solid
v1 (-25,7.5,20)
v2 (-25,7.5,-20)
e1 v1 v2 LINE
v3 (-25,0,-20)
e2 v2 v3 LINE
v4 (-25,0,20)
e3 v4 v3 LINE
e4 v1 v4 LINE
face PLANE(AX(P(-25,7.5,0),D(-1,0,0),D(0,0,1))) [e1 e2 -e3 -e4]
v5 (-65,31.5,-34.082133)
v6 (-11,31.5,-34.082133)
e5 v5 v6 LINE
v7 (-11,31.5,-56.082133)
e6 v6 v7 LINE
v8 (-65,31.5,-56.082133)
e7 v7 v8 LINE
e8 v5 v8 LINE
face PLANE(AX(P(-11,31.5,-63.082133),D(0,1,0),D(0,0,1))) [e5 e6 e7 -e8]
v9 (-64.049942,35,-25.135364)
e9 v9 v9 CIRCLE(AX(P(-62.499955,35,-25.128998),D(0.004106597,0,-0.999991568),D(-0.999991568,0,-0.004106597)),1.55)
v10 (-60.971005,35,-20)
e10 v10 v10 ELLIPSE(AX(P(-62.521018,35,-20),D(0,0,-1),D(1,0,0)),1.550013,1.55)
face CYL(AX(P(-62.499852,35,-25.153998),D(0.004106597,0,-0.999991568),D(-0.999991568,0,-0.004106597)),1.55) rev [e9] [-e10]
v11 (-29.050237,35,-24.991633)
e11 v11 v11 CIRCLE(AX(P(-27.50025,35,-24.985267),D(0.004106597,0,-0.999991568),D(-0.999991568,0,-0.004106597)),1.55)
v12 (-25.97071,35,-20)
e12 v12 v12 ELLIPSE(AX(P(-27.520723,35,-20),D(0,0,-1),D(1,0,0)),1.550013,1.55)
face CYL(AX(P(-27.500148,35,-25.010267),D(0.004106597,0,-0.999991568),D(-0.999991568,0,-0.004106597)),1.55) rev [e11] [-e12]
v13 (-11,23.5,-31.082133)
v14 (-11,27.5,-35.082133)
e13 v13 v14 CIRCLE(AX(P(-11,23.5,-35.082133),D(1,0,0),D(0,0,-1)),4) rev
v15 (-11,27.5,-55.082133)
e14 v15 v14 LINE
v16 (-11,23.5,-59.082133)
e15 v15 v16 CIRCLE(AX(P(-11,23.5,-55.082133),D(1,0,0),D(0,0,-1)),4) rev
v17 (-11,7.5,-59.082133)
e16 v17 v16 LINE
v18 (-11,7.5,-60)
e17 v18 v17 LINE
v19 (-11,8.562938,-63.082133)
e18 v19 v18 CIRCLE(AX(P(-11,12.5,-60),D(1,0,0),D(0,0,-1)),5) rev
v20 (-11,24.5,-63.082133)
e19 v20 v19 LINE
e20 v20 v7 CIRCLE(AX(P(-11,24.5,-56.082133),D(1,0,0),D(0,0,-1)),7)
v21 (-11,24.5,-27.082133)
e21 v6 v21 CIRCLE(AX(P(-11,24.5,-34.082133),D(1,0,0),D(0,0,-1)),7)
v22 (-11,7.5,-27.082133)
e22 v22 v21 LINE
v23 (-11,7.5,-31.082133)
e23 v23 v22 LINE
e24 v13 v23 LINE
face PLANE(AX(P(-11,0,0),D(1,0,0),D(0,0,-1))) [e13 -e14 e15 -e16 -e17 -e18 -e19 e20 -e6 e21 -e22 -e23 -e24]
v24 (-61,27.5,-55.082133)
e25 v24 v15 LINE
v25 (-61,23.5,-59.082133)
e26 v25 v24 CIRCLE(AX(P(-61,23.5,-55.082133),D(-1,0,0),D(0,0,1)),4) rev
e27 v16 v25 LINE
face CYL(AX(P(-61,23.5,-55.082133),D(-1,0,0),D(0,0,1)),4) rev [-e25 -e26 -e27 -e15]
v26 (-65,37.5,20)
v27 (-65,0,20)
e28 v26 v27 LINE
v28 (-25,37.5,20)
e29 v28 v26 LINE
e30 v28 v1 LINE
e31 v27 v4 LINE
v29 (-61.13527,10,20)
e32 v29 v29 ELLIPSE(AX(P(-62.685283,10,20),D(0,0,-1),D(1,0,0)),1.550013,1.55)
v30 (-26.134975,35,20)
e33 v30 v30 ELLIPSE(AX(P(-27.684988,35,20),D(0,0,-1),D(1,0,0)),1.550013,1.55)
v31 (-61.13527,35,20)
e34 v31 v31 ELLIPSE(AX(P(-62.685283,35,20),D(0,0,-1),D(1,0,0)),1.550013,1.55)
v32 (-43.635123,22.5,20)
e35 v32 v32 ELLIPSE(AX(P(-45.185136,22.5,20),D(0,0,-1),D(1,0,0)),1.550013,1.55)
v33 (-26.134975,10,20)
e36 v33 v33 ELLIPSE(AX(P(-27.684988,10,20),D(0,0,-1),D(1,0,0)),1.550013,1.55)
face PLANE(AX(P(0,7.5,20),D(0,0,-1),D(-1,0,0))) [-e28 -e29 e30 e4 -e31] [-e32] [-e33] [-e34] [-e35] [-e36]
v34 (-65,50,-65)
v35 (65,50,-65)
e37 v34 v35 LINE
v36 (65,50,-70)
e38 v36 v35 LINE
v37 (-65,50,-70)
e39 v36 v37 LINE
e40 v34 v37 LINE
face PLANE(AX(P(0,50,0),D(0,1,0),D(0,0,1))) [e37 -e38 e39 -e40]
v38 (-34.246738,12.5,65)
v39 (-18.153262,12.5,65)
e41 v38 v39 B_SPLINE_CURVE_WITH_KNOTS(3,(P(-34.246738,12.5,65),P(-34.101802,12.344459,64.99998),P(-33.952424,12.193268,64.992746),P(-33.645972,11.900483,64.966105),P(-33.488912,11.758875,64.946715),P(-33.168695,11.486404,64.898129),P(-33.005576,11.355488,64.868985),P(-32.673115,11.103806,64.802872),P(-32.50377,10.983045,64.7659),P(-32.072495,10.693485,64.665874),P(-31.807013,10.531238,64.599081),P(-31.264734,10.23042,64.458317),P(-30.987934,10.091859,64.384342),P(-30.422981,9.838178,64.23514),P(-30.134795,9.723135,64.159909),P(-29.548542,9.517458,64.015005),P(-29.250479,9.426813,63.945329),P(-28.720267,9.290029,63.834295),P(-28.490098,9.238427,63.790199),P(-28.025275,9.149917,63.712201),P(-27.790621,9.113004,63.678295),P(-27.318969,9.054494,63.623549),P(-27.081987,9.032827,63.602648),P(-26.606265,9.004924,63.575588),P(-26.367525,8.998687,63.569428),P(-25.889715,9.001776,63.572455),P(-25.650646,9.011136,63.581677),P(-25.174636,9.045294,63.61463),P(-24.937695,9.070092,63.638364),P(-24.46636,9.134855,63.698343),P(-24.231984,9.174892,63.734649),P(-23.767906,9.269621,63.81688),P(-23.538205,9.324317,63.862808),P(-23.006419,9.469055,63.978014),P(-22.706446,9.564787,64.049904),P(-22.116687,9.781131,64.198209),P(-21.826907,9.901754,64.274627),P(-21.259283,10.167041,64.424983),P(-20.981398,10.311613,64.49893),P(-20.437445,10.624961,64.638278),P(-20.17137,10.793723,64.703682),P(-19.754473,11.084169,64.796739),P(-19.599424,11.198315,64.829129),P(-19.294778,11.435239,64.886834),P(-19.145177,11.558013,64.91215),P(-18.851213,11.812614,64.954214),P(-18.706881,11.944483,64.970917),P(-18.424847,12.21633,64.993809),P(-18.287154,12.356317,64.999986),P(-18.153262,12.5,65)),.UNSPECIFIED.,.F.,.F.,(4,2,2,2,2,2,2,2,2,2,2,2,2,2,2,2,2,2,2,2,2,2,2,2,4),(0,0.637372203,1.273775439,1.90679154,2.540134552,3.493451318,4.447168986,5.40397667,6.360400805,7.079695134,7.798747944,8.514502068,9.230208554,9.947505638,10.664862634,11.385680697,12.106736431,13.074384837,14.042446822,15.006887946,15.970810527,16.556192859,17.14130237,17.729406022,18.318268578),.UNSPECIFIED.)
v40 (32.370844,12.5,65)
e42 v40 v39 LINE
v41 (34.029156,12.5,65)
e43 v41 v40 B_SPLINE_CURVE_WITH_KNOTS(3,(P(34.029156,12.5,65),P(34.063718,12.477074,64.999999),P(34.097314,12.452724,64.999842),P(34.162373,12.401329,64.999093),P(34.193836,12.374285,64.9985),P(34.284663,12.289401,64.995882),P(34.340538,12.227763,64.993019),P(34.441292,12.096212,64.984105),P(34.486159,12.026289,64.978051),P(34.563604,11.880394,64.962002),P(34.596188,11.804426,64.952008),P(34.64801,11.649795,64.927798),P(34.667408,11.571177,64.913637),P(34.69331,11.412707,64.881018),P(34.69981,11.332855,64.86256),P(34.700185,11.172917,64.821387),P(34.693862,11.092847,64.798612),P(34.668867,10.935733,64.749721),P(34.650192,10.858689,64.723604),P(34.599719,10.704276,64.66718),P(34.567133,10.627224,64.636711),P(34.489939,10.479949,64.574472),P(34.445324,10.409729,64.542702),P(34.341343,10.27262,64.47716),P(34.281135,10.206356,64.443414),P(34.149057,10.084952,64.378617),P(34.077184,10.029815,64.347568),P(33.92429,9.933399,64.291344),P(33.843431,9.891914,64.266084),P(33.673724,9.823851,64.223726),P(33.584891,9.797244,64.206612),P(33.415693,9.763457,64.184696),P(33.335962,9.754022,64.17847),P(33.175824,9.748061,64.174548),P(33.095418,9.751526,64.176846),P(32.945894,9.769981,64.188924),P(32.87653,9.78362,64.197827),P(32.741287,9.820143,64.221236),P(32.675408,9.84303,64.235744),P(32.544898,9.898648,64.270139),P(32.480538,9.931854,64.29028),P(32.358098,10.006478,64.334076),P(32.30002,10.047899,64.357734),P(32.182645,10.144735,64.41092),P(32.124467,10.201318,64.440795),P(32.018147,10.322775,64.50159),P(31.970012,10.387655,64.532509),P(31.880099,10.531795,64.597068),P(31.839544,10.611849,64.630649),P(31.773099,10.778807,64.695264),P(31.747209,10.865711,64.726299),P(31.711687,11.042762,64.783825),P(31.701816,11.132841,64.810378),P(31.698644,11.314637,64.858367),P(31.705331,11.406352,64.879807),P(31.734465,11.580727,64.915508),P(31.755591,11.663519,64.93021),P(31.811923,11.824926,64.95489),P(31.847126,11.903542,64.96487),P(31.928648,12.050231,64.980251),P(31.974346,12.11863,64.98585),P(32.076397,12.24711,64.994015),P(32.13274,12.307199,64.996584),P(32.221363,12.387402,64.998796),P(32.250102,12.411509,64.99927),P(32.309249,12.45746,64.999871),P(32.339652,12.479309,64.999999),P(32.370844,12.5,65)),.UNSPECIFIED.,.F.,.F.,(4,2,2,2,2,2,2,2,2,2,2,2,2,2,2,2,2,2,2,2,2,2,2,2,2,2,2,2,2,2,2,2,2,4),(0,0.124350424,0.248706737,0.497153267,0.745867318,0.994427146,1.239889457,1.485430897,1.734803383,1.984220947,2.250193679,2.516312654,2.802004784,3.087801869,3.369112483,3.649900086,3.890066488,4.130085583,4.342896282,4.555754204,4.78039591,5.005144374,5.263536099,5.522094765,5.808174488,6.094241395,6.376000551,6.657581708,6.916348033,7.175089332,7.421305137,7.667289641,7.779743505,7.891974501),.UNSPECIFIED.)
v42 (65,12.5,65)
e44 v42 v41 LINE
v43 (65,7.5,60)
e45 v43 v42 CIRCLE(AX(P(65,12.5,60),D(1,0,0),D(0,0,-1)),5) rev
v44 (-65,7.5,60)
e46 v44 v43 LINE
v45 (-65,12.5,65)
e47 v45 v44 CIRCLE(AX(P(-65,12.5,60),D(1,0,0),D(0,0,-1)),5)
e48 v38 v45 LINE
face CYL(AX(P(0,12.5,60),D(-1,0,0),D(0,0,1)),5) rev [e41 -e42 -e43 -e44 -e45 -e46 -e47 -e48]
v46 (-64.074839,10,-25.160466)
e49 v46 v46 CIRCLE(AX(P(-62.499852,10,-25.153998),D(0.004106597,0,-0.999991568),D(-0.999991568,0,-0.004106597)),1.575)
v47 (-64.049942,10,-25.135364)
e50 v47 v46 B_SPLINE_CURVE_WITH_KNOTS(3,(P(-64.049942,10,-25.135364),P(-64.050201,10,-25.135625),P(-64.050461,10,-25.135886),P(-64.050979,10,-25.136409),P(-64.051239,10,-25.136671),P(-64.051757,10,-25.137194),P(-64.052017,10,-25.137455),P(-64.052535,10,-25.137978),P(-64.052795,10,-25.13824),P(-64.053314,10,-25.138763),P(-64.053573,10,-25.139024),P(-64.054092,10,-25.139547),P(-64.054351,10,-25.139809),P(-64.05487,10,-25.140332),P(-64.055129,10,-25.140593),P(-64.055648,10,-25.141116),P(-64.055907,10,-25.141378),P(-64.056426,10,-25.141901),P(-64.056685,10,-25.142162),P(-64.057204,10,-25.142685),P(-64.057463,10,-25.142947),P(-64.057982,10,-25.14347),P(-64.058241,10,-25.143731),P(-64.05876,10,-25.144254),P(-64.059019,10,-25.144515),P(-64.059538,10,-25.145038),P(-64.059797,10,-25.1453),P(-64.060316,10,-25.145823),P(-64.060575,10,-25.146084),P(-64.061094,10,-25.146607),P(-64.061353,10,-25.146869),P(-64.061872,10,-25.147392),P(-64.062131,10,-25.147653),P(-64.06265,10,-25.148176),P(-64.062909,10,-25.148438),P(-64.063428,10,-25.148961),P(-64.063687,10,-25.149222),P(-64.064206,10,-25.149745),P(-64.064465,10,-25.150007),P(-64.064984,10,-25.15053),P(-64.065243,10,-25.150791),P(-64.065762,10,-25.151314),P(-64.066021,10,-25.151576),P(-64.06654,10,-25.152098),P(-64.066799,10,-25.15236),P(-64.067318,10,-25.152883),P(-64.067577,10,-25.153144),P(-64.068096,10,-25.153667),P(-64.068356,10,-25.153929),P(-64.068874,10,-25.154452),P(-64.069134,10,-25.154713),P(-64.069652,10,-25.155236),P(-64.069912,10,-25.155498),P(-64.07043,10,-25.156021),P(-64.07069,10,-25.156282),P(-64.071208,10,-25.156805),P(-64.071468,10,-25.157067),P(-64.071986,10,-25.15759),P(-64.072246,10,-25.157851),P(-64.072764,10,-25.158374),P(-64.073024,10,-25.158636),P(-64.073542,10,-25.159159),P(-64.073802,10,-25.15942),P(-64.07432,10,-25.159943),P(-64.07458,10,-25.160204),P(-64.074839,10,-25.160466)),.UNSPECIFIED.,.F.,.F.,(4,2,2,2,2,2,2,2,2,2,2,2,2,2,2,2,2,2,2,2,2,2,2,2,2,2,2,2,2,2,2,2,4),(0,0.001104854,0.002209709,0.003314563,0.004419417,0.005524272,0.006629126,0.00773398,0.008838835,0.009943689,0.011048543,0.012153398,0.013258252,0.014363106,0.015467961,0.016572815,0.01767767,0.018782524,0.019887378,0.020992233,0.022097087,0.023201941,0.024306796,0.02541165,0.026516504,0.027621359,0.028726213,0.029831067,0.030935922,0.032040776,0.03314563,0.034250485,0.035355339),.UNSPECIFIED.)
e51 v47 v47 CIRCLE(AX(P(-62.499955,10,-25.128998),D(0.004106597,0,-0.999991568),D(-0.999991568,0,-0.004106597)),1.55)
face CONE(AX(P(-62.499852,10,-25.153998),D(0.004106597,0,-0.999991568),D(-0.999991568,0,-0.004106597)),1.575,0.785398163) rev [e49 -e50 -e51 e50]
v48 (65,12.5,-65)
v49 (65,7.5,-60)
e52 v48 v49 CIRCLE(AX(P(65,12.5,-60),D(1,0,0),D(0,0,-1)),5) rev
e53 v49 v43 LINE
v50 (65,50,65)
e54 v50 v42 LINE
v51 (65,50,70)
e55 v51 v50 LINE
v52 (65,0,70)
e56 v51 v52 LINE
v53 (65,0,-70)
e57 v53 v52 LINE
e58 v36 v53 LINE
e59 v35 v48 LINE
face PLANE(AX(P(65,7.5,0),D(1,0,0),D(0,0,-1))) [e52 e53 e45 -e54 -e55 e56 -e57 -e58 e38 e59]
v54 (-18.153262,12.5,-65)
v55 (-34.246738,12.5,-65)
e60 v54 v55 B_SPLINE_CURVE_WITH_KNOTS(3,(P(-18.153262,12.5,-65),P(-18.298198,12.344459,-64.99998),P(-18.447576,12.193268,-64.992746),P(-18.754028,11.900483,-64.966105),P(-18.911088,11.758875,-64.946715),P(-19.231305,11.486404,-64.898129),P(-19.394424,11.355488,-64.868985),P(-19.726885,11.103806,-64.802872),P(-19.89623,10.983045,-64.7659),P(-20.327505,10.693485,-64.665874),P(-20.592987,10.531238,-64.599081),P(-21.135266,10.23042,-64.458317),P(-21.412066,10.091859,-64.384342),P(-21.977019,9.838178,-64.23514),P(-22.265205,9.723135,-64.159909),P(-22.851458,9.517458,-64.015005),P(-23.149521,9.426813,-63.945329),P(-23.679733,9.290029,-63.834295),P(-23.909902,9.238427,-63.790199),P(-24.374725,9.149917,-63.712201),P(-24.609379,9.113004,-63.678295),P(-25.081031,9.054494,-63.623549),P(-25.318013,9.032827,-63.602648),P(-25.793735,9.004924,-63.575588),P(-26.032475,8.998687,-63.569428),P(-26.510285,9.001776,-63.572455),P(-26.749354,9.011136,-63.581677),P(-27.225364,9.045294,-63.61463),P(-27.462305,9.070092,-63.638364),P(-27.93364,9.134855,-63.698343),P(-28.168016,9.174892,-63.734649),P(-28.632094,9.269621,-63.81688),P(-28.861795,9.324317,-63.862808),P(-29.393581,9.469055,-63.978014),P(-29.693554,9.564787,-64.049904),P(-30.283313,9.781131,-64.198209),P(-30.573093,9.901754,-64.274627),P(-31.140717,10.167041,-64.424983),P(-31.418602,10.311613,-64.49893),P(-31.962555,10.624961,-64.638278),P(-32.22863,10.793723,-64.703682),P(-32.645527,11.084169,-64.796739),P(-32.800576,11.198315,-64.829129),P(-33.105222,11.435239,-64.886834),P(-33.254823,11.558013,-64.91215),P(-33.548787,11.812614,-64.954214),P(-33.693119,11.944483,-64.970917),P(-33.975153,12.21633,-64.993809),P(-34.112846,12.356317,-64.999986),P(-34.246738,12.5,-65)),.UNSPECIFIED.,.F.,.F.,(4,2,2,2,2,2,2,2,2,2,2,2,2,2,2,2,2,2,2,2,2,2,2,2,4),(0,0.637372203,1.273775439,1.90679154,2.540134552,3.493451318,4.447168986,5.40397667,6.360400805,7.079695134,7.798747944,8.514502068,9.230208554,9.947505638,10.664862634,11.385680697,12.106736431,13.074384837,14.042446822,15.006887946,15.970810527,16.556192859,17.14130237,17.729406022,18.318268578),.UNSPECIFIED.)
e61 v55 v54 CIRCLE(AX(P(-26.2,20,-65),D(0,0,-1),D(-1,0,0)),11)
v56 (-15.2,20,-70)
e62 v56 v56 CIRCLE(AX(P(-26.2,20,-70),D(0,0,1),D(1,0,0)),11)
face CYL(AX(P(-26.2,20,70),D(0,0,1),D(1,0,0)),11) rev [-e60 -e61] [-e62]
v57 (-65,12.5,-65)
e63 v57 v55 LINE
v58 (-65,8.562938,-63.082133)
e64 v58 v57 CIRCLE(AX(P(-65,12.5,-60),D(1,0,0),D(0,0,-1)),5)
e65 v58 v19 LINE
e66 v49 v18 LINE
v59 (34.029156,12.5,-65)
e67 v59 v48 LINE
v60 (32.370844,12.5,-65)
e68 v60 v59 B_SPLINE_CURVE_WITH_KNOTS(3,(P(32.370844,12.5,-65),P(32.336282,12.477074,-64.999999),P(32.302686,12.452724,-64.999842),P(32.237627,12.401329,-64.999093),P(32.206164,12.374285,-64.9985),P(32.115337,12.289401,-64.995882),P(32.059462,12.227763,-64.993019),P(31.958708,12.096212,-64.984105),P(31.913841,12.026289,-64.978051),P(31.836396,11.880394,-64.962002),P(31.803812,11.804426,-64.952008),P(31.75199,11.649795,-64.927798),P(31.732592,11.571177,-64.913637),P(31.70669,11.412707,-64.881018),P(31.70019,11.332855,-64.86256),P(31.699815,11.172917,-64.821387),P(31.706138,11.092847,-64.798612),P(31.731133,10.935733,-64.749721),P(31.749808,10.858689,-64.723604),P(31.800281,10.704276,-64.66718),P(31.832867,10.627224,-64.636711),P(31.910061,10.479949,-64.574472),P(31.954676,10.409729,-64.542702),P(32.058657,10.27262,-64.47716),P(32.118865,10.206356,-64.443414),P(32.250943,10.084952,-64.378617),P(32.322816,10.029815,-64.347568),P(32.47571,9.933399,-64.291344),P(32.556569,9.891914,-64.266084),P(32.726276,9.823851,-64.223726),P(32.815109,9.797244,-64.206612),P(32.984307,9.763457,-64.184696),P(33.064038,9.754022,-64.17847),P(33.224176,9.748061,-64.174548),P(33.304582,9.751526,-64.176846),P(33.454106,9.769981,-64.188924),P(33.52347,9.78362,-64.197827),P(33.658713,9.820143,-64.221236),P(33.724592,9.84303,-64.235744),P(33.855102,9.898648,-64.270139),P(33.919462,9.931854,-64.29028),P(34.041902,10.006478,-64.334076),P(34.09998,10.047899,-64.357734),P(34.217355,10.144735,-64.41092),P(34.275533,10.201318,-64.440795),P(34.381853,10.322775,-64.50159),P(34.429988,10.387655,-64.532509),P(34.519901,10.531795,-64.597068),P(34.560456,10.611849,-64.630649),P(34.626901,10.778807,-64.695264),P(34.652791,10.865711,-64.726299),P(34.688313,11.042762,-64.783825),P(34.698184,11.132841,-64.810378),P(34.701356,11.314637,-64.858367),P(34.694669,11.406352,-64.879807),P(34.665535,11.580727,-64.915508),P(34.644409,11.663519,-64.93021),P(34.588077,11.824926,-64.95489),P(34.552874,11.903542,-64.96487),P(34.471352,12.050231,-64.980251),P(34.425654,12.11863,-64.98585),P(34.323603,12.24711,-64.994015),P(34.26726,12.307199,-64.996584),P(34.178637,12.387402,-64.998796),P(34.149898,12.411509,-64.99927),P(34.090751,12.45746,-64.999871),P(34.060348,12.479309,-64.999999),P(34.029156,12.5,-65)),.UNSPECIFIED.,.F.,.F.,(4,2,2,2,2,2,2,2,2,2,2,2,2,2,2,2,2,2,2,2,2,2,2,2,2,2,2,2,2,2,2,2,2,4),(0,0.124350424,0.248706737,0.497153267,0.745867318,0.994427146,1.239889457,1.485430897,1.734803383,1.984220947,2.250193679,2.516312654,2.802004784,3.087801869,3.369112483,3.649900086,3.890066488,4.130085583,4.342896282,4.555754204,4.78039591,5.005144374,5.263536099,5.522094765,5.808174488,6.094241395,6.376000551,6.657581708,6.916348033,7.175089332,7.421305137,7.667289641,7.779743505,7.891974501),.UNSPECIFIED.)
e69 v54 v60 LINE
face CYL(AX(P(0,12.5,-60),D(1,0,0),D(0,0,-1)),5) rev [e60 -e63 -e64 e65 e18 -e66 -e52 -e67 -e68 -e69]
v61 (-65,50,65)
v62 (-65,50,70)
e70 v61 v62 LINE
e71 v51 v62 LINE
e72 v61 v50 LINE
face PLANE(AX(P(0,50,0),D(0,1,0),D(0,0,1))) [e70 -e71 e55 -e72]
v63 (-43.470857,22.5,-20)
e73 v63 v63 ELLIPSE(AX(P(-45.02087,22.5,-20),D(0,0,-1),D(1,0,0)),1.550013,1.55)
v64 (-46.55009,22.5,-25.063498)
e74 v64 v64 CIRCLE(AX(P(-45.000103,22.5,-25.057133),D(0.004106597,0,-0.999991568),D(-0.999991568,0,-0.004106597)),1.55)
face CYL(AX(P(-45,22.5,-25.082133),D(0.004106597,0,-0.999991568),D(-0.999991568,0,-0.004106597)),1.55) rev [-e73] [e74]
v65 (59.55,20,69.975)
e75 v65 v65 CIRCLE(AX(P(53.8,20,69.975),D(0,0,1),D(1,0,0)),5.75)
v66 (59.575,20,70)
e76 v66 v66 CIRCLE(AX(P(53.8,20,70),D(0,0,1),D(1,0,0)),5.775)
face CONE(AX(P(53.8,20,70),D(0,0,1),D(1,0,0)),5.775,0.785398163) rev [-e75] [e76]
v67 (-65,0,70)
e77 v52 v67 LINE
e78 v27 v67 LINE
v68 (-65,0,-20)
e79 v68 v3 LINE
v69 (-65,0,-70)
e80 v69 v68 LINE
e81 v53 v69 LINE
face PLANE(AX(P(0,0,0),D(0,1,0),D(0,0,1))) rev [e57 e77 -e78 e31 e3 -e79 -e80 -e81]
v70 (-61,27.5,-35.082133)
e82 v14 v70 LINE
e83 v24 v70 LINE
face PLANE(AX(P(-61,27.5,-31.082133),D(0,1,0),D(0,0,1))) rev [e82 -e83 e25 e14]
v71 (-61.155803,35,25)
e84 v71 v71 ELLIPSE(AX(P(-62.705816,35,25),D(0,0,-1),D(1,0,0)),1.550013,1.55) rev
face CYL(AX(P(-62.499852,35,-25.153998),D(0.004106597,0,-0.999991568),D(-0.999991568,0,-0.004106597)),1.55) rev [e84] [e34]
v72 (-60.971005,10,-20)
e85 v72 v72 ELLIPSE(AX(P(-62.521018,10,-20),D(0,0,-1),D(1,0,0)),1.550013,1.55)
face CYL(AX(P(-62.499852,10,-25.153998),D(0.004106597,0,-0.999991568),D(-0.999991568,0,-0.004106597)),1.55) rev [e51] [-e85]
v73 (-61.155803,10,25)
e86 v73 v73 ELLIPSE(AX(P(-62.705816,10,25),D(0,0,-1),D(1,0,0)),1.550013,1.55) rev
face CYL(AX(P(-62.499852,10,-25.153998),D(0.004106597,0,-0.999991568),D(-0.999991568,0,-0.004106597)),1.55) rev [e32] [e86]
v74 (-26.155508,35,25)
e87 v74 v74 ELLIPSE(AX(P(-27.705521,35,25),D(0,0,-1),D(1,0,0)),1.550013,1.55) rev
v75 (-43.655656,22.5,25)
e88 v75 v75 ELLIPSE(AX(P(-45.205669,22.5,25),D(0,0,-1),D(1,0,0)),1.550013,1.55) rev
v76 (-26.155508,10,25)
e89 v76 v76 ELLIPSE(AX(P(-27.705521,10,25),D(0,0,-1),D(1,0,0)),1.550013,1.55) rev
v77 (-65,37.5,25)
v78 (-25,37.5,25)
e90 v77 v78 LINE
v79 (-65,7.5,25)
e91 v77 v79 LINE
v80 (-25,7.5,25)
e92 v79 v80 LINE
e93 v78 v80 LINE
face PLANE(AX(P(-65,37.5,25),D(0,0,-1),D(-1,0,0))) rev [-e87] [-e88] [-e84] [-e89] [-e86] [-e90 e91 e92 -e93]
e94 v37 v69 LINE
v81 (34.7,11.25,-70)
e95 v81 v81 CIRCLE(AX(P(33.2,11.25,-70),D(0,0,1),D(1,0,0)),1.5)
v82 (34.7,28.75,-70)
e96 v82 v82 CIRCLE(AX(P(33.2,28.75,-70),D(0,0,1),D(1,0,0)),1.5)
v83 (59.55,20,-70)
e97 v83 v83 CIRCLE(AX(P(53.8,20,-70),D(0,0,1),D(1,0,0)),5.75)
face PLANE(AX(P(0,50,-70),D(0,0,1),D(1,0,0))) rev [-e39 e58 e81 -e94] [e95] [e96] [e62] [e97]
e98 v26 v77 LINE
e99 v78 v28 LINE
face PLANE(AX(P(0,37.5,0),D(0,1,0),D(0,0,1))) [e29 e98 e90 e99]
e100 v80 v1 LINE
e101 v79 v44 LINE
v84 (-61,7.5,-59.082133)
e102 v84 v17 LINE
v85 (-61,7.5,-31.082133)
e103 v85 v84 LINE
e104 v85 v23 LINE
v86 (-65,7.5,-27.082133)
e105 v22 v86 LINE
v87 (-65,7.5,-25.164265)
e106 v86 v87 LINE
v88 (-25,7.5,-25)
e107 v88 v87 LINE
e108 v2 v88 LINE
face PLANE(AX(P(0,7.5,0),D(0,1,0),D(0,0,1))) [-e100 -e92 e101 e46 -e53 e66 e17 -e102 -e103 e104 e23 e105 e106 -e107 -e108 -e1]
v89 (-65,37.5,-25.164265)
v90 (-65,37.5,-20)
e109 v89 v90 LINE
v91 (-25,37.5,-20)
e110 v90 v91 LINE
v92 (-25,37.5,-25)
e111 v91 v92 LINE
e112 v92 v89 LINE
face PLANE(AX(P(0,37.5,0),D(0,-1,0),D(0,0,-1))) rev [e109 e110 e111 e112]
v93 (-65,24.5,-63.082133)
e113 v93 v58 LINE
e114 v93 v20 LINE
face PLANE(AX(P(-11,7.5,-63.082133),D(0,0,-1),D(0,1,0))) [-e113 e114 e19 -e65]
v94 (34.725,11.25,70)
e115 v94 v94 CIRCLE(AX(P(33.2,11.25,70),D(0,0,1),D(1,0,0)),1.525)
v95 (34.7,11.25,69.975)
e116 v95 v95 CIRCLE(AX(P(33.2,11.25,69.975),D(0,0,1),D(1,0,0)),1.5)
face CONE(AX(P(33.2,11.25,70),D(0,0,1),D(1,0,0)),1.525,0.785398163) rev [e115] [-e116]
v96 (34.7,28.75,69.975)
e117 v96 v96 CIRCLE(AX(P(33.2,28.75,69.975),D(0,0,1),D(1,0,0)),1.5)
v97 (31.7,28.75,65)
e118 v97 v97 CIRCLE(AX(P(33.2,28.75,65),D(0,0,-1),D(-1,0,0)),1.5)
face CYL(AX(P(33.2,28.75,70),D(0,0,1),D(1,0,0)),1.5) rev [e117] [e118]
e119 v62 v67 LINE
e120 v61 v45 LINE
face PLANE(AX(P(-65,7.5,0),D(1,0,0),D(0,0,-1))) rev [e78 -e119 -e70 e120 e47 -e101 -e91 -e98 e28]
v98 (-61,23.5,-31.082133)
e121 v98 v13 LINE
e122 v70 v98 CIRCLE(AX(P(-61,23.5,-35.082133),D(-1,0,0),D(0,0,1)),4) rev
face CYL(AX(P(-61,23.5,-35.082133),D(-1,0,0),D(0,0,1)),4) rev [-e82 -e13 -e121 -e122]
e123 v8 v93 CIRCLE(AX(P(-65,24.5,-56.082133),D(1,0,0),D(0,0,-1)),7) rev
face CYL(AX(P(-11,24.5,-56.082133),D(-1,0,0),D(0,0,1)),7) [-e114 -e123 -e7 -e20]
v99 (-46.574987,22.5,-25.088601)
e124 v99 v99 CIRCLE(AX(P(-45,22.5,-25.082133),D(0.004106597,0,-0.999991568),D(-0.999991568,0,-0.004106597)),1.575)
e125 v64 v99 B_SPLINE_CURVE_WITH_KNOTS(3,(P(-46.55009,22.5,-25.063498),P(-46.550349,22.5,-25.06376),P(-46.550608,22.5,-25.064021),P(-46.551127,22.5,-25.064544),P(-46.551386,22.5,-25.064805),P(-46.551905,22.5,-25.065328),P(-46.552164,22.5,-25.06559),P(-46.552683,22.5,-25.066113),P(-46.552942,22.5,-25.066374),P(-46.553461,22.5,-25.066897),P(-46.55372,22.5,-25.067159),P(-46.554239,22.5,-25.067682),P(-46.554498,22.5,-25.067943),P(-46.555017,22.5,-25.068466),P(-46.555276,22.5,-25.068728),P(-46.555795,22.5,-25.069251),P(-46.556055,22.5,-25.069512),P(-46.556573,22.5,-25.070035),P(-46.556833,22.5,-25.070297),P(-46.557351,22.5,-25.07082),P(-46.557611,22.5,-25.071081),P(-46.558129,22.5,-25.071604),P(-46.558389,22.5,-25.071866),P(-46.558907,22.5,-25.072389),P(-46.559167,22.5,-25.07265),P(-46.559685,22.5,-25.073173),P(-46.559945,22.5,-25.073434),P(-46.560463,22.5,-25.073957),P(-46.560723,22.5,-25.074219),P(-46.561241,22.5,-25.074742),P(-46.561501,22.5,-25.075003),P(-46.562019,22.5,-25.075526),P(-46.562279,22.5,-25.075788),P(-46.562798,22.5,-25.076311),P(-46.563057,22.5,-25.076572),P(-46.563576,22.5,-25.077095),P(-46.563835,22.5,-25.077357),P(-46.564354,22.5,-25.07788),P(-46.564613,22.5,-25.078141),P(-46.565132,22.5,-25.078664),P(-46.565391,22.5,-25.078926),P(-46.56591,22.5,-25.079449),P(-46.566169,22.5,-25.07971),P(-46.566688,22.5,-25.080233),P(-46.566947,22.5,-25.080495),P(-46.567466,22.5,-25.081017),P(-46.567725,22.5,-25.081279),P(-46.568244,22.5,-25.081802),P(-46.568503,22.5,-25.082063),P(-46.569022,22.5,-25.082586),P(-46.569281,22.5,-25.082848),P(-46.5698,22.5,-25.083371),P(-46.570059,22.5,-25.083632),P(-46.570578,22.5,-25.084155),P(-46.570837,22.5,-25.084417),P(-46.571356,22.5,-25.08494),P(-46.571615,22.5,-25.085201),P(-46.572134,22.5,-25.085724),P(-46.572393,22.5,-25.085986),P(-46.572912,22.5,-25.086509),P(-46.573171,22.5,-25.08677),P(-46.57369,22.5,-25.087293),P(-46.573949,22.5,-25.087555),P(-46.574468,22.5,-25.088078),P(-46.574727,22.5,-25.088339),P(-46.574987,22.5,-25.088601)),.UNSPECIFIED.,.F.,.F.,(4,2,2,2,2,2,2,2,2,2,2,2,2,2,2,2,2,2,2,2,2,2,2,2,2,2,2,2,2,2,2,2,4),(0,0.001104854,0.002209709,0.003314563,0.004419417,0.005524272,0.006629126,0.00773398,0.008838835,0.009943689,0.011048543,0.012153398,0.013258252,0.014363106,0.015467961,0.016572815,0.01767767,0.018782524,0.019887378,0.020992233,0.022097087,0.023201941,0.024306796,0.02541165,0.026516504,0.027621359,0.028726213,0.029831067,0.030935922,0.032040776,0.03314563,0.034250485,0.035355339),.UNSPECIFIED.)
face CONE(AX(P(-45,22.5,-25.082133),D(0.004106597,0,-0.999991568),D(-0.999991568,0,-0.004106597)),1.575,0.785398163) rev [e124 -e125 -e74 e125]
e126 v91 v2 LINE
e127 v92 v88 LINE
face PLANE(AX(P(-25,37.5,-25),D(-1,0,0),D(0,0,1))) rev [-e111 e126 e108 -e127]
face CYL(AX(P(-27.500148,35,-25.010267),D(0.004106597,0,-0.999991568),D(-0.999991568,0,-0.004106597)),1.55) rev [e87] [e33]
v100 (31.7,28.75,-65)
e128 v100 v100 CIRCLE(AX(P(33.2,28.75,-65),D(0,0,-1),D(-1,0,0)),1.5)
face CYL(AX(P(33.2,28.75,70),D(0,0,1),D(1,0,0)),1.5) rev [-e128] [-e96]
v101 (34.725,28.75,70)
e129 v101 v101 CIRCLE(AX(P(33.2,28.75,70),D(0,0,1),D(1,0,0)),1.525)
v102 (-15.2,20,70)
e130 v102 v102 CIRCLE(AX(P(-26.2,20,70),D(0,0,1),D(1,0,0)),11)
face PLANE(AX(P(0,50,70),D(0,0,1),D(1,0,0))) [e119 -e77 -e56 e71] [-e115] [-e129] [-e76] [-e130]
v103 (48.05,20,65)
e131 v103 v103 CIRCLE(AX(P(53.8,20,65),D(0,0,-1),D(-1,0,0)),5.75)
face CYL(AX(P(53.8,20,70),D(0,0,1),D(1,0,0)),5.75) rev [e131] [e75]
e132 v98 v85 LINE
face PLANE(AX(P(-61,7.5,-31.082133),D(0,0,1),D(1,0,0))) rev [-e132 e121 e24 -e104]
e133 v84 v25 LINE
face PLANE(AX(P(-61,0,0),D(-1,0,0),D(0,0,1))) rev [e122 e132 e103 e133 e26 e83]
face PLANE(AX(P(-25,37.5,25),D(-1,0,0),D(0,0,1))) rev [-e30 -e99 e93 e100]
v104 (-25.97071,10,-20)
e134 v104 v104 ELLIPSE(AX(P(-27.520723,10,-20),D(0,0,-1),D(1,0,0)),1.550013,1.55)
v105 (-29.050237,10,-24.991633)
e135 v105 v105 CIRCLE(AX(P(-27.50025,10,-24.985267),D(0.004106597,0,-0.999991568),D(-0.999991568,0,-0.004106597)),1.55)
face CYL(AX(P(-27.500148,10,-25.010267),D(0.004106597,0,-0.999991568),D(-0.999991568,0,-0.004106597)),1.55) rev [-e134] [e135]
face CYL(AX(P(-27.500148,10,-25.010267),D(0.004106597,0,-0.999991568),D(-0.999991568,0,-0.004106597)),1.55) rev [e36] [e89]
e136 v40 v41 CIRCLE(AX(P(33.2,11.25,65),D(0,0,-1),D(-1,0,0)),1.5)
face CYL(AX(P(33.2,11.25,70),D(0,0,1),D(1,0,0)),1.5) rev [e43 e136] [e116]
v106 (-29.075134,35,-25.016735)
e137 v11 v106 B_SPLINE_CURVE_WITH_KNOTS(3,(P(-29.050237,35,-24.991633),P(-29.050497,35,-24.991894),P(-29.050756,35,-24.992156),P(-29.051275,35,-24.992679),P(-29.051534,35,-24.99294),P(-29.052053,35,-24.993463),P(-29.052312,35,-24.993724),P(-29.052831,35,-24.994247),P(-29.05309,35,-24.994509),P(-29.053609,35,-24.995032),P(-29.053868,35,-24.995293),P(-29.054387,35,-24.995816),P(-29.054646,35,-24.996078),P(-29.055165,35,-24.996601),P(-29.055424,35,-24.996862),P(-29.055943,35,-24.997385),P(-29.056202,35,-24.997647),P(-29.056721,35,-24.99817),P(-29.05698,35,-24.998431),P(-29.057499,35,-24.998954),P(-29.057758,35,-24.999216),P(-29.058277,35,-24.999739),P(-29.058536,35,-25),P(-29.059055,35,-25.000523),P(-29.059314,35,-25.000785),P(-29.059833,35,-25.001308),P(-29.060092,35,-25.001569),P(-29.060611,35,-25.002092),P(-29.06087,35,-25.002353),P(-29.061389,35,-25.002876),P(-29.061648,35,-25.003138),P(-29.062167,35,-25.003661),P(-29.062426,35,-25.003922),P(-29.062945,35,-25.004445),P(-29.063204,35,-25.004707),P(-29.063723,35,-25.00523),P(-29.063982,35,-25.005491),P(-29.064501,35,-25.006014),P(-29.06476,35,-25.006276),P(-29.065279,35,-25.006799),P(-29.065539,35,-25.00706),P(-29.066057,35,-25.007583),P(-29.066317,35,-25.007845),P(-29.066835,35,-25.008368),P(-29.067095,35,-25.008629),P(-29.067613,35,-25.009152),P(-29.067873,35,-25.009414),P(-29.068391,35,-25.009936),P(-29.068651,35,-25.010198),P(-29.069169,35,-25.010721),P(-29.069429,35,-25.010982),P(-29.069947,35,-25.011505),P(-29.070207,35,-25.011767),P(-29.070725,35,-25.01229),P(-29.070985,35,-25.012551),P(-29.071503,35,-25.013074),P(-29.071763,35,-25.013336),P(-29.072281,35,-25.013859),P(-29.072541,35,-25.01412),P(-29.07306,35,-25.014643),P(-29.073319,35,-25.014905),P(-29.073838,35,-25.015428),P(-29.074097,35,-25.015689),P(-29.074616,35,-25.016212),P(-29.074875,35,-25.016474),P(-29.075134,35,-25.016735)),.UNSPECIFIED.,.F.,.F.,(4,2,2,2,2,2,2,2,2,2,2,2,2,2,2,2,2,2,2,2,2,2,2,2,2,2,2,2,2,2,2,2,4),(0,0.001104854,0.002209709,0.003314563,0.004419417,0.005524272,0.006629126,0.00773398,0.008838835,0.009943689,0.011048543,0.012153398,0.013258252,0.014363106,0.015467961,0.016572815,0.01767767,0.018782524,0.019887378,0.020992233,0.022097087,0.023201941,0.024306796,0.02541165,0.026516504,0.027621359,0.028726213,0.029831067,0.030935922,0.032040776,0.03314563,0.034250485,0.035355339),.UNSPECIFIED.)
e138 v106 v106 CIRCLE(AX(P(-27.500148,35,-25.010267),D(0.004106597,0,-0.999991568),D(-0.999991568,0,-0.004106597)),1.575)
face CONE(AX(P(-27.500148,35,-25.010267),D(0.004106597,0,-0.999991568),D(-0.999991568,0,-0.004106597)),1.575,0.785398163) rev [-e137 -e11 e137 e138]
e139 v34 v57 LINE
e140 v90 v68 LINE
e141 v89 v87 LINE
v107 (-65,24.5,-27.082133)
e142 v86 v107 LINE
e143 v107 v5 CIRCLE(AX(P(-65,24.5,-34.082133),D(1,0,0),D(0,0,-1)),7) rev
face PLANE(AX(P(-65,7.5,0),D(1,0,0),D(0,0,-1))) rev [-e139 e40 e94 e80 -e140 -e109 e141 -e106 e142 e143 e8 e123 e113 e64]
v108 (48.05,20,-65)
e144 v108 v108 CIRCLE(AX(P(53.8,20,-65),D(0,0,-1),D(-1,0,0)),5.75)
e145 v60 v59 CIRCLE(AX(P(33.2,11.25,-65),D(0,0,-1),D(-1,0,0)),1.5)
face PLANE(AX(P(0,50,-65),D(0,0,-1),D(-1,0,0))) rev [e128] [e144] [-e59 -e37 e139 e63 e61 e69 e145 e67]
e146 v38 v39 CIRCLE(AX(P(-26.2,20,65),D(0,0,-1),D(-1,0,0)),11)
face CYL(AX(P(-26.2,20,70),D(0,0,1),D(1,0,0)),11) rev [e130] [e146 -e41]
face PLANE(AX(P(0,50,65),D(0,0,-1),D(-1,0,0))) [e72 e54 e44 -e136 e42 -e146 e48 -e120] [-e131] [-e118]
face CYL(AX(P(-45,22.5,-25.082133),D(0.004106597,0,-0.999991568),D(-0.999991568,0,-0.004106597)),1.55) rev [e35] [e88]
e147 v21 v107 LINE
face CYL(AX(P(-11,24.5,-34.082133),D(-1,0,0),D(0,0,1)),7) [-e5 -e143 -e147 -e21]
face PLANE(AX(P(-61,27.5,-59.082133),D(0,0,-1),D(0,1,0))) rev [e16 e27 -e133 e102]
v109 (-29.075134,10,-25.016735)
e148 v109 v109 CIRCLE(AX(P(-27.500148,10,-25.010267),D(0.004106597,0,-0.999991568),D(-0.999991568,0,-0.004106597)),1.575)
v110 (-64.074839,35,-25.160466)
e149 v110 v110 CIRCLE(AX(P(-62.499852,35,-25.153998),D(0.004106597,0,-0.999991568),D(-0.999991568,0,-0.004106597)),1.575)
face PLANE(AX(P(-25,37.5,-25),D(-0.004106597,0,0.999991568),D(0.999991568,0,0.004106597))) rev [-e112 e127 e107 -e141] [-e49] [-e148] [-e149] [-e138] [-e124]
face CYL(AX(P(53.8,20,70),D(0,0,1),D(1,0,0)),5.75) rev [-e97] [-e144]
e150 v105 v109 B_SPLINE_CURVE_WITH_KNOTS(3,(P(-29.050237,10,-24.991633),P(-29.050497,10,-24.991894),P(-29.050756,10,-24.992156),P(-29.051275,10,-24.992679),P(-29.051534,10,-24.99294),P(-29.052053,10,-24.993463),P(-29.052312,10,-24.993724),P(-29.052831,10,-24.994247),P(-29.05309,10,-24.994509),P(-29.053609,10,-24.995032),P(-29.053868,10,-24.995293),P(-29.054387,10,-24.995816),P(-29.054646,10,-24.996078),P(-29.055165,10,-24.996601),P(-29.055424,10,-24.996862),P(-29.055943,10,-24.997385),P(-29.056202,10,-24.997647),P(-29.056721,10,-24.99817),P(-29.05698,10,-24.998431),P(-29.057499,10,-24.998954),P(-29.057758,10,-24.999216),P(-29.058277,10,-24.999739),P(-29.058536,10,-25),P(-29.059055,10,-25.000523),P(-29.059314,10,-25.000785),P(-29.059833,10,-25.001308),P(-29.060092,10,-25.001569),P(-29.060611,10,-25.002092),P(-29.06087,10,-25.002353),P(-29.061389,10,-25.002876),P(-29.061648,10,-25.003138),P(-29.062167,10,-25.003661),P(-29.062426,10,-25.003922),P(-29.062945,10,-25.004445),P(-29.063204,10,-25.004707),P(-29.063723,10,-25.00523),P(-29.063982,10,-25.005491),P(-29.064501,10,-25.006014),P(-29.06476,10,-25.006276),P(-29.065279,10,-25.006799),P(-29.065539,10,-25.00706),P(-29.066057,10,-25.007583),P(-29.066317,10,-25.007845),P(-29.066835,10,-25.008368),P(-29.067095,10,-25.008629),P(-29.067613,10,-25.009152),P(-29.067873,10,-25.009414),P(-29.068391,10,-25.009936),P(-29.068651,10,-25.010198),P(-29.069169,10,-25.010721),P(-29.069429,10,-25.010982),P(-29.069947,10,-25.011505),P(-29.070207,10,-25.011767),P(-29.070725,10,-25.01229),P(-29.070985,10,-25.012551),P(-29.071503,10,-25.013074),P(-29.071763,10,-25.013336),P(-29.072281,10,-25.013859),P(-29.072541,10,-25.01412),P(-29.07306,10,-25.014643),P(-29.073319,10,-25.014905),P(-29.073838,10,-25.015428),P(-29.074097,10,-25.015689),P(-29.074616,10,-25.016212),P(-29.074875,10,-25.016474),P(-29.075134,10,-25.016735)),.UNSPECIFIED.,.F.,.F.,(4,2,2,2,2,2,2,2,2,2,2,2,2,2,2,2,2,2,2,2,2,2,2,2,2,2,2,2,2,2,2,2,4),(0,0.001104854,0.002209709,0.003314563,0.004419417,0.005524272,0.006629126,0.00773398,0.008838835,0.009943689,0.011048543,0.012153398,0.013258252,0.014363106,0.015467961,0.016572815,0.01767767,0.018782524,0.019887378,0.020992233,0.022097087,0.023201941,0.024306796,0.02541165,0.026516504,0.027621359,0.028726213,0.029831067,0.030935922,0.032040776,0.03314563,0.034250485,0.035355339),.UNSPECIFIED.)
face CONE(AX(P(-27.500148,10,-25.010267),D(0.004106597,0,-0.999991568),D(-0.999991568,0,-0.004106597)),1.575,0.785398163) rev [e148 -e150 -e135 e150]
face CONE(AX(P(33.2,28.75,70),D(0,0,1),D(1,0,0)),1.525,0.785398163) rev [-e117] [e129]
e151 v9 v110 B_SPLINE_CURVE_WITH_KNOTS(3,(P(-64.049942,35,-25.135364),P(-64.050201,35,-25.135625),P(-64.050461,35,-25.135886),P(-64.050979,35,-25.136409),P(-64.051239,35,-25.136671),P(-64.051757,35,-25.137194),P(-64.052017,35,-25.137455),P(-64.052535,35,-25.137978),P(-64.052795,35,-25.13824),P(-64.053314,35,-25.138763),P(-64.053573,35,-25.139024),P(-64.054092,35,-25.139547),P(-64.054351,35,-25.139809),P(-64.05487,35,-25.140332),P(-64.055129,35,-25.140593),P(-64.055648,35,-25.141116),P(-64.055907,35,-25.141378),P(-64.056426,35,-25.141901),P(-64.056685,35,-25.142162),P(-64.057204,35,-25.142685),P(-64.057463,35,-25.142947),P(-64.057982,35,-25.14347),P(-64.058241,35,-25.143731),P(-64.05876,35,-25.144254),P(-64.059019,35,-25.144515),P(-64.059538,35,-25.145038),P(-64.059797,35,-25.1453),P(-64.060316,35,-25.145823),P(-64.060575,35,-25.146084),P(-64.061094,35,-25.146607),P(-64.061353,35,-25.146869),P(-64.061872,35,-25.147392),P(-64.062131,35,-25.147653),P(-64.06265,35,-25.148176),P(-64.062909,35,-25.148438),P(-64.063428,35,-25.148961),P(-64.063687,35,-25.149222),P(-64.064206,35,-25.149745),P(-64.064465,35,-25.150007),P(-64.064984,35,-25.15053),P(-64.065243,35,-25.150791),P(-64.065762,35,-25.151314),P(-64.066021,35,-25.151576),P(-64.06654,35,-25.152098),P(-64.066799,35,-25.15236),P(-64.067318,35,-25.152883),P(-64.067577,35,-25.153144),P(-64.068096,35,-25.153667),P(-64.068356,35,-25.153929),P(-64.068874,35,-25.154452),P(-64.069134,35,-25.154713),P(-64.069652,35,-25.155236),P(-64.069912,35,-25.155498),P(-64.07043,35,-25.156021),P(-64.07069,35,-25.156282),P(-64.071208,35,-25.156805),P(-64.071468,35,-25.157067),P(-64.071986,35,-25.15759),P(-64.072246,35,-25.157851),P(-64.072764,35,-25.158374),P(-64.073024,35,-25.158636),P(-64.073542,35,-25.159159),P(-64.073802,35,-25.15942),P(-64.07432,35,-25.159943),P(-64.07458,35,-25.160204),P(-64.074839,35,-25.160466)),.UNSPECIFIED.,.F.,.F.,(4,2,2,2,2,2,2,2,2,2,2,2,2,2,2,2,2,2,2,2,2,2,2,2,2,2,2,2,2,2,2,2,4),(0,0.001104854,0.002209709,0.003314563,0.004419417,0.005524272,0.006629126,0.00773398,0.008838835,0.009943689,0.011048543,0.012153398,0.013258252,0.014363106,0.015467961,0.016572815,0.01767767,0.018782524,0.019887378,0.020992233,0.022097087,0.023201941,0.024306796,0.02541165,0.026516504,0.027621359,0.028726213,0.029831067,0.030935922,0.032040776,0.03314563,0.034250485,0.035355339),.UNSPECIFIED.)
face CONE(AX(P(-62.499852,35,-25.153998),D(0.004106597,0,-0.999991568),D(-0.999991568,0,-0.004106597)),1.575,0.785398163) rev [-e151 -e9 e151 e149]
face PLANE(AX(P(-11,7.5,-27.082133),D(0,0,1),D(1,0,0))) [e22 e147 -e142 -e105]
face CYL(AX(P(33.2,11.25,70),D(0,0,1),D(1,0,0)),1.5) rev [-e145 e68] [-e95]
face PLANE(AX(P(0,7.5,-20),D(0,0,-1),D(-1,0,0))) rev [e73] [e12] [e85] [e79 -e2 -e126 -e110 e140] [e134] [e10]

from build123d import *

# Parameters (mm, degrees)
BOSS_EXTRUDE1_DEPTH                    = 7.5
SKETCH2_4_W                            = 130
SKETCH2_4_H                            = 5
BOSS_EXTRUDE2_DEPTH                    = 50
F_3_0MM_DOWEL_HOLE1_D                  = 3
F_3_0MM_DOWEL_HOLE1_CSINK_D            = 3.05
F_3_0MM_DOWEL_HOLE1_CSINK_ANGLE        = 90
FILLET1_R                              = 5
F_11_5_11_5_DIAMETER_HOLE2_D           = 11.5
F_11_5_11_5_DIAMETER_HOLE2_CSINK_D     = 11.55
F_11_5_11_5_DIAMETER_HOLE2_CSINK_ANGLE = 90
F_1_0_22_DIAMETER_HOLE1_D              = 22
F_1_0_22_DIAMETER_HOLE1_DEPTH          = 140
F_1_0_22_DIAMETER_HOLE1_TIP            = 6.609466809
SKETCH16_W                             = 40
SKETCH16_H                             = 5
BOSS_EXTRUDE3_DEPTH                    = 30
F_3_1_3_1_DIAMETER_HOLE1_AT_2_COUNT    = 2
F_3_1_3_1_DIAMETER_HOLE1_AT_2_PITCH    = 21.505813168
F_3_1_3_1_DIAMETER_HOLE1_AT_3_COUNT    = 2
F_3_1_3_1_DIAMETER_HOLE1_AT_3_PITCH    = 21.505813168
F_3_1_3_1_DIAMETER_HOLE1_AT_4_COUNT    = 2
F_3_1_3_1_DIAMETER_HOLE1_AT_4_PITCH    = 21.505813168
F_3_1_3_1_DIAMETER_HOLE1_AT_5_COUNT    = 2
F_3_1_3_1_DIAMETER_HOLE1_AT_5_PITCH    = 21.505813168
SKETCH22_W                             = 36
SKETCH22_H                             = 24
BOSS_EXTRUDE4_DEPTH                    = 54
SKETCH23_W                             = 28
SKETCH23_H                             = 20
CUT_EXTRUDE1_DEPTH                     = 50
FILLET2_R                              = 4
FILLET3_R                              = 7


with BuildPart() as part:
    # Sketch2 → Boss-Extrude1 (new body)
    with BuildSketch(Plane(origin=(0, 0, 0), x_dir=(1, 0, 0), z_dir=(0, 1, 0))):
        Polygon((65, 65), (-65, 65), (-65, 25.164265249), (-65, 20), (-25, 20), (-25, -20), (-65, -20), (-65, -25.134268309), (-65, -65), (65, -65), align=None)
    extrude(amount=BOSS_EXTRUDE1_DEPTH)

    # Sketch2<4> → Boss-Extrude2 (add)
    with BuildSketch(Plane(origin=(0, 0, 0), x_dir=(1, 0, 0), z_dir=(0, 1, 0))):
        with Locations((0, -67.5)):
            Rectangle(SKETCH2_4_W, SKETCH2_4_H)
        with Locations((0, 67.5)):
            Rectangle(SKETCH2_4_W, SKETCH2_4_H)
    extrude(amount=BOSS_EXTRUDE2_DEPTH)

    # Ø3.0mm Dowel Hole1 (through all)
    with Locations(Plane.XY.offset(70)):
        with Locations((33.2, 28.75), (33.2, 11.25)):
            CounterSinkHole(F_3_0MM_DOWEL_HOLE1_D / 2, F_3_0MM_DOWEL_HOLE1_CSINK_D / 2, counter_sink_angle=F_3_0MM_DOWEL_HOLE1_CSINK_ANGLE)

    # Fillet1
    # the kernel refuses this fillet: 5 mm, written as the material it adds along each edge
    with BuildSketch(Plane(origin=(-65, 7.5, 65), x_dir=(0, 0, -1), z_dir=(1, 0, 0))) as fillet1_piece_1_section:
        with BuildLine():
            CenterArc((FILLET1_R, FILLET1_R), FILLET1_R, 180, 90)
            Line((0, FILLET1_R), (0, 0))
            Line((0, 0), (FILLET1_R, 0))
        make_face()
    fillet1_piece_1 = extrude(amount=130, mode=Mode.PRIVATE)
    fillet1_piece_1 = fillet1_piece_1 - Plane(origin=(33.2, 11.25, 63.865303448), x_dir=(-1, 0, 0), z_dir=(0, 0, -1)) * Cylinder(1.5, 280, mode=Mode.PRIVATE)
    add(fillet1_piece_1)
    with BuildSketch(Plane(origin=(65, 7.5, -65), x_dir=(0, 0, 1), z_dir=(-1, 0, 0))) as fillet1_piece_2_section:
        with BuildLine():
            CenterArc((FILLET1_R, FILLET1_R), FILLET1_R, 180, 90)
            Line((0, FILLET1_R), (0, 0))
            Line((0, 0), (FILLET1_R, 0))
        make_face()
    fillet1_piece_2 = extrude(amount=130, mode=Mode.PRIVATE)
    fillet1_piece_2 = fillet1_piece_2 - Plane(origin=(33.2, 11.25, -63.865303448), x_dir=(-1, 0, 0), z_dir=(0, 0, -1)) * Cylinder(1.5, 280, mode=Mode.PRIVATE)
    add(fillet1_piece_2)

    # Ø11.5 (11.5) Diameter Hole2 (through all)
    with Locations(Plane(origin=(53.8, 20, 70), x_dir=(1, 0, 0), z_dir=(0, 0, 1))):
        with Locations((0, 0)):
            CounterSinkHole(F_11_5_11_5_DIAMETER_HOLE2_D / 2, F_11_5_11_5_DIAMETER_HOLE2_CSINK_D / 2, counter_sink_angle=F_11_5_11_5_DIAMETER_HOLE2_CSINK_ANGLE)

    # Ø1.0 (22) Diameter Hole1
    with Locations(Plane(origin=(-26.2, 20, 70), x_dir=(1, 0, 0), z_dir=(0, 0, 1))):
        with Locations((0, 0)):
            Hole(F_1_0_22_DIAMETER_HOLE1_D / 2, depth=F_1_0_22_DIAMETER_HOLE1_DEPTH)
            with Locations((0, 0, -(F_1_0_22_DIAMETER_HOLE1_DEPTH + F_1_0_22_DIAMETER_HOLE1_TIP / 2))):  # 118° drill point
                Cone(0, F_1_0_22_DIAMETER_HOLE1_D / 2, F_1_0_22_DIAMETER_HOLE1_TIP, mode=Mode.SUBTRACT)

    # Sketch16 → Boss-Extrude3 (add)
    with BuildSketch(Plane(origin=(0, 7.5, 0), x_dir=(1, 0, 0), z_dir=(0, 1, 0))):
        Polygon((-65, 20), (-65, 25.164265249), (-25, 25), (-25, 20), align=None)
        with Locations((-45, -22.5)):
            Rectangle(SKETCH16_W, SKETCH16_H)
    extrude(amount=BOSS_EXTRUDE3_DEPTH)

    # Sketch20 → Ø3.1 (3.1) Diameter Hole1 (revolve, cut)
    with BuildSketch(Plane(origin=(-45, 22.5, -25.082132625), x_dir=(-0.9999915678966332, 0, -0.004106596599781751), z_dir=(0, 1, 0))):
        Polygon((0, 0), (0, 51.096180316), (1.55, 50.164846357), (1.55, 0.025), (1.575, 0), align=None)
    f_3_1_3_1_diameter_hole1 = revolve(axis=Axis((-44.973923112, 22.5, -31.432079081), (-0.004106596599781799, 0, 0.9999915678966332)), mode=Mode.SUBTRACT)

    # Ø3.1 (3.1) Diameter Hole1 at 2: Ø3.1 (3.1) Diameter Hole1 ×2
    with Locations(*[Vector(0.8137266097219926, 0.5812381937190964, 0.0033416751059861844) * (i * F_3_1_3_1_DIAMETER_HOLE1_AT_2_PITCH) for i in range(1, F_3_1_3_1_DIAMETER_HOLE1_AT_2_COUNT)]):
        add(f_3_1_3_1_diameter_hole1, mode=Mode.SUBTRACT)

    # Ø3.1 (3.1) Diameter Hole1 at 3: Ø3.1 (3.1) Diameter Hole1 ×2
    with Locations(*[Vector(-0.8137266097219932, 0.5812381937190956, -0.0033416751059863045) * (i * F_3_1_3_1_DIAMETER_HOLE1_AT_3_PITCH) for i in range(1, F_3_1_3_1_DIAMETER_HOLE1_AT_3_COUNT)]):
        add(f_3_1_3_1_diameter_hole1, mode=Mode.SUBTRACT)

    # Ø3.1 (3.1) Diameter Hole1 at 4: Ø3.1 (3.1) Diameter Hole1 ×2
    with Locations(*[Vector(-0.8137266097219928, -0.5812381937190962, -0.0033416751059863027) * (i * F_3_1_3_1_DIAMETER_HOLE1_AT_4_PITCH) for i in range(1, F_3_1_3_1_DIAMETER_HOLE1_AT_4_COUNT)]):
        add(f_3_1_3_1_diameter_hole1, mode=Mode.SUBTRACT)

    # Ø3.1 (3.1) Diameter Hole1 at 5: Ø3.1 (3.1) Diameter Hole1 ×2
    with Locations(*[Vector(0.8137266097219922, -0.581238193719097, 0.003341675105986184) * (i * F_3_1_3_1_DIAMETER_HOLE1_AT_5_PITCH) for i in range(1, F_3_1_3_1_DIAMETER_HOLE1_AT_5_COUNT)]):
        add(f_3_1_3_1_diameter_hole1, mode=Mode.SUBTRACT)

    # Sketch22 → Boss-Extrude4 (add)
    with BuildSketch(Plane.ZY.offset(65)):
        with Locations((-45.082132625, 19.5)):
            Rectangle(SKETCH22_W, SKETCH22_H)
    extrude(amount=-BOSS_EXTRUDE4_DEPTH)

    # Sketch23 → Cut-Extrude1 (cut)
    with BuildSketch(Plane(origin=(-11, 0, 0), x_dir=(0, 0, -1), z_dir=(1, 0, 0))):
        with Locations((45.082132625, 17.5)):
            Rectangle(SKETCH23_W, SKETCH23_H)
    extrude(amount=-CUT_EXTRUDE1_DEPTH, mode=Mode.SUBTRACT)

    # Fillet2
    fillet2_edges = [part.edges().sort_by_distance(p)[0] for p in [
        (-36, 27.5, -31.082132625),
        (-36, 27.5, -59.082132625),
    ]]
    fillet(fillet2_edges, radius=FILLET2_R)

    # Fillet3
    fillet3_edges = [part.edges().sort_by_distance(p)[0] for p in [
        (-38, 31.5, -27.082132625),
        (-38, 31.5, -63.082132625),
    ]]
    fillet(fillet3_edges, radius=FILLET3_R)


solid = part.part
